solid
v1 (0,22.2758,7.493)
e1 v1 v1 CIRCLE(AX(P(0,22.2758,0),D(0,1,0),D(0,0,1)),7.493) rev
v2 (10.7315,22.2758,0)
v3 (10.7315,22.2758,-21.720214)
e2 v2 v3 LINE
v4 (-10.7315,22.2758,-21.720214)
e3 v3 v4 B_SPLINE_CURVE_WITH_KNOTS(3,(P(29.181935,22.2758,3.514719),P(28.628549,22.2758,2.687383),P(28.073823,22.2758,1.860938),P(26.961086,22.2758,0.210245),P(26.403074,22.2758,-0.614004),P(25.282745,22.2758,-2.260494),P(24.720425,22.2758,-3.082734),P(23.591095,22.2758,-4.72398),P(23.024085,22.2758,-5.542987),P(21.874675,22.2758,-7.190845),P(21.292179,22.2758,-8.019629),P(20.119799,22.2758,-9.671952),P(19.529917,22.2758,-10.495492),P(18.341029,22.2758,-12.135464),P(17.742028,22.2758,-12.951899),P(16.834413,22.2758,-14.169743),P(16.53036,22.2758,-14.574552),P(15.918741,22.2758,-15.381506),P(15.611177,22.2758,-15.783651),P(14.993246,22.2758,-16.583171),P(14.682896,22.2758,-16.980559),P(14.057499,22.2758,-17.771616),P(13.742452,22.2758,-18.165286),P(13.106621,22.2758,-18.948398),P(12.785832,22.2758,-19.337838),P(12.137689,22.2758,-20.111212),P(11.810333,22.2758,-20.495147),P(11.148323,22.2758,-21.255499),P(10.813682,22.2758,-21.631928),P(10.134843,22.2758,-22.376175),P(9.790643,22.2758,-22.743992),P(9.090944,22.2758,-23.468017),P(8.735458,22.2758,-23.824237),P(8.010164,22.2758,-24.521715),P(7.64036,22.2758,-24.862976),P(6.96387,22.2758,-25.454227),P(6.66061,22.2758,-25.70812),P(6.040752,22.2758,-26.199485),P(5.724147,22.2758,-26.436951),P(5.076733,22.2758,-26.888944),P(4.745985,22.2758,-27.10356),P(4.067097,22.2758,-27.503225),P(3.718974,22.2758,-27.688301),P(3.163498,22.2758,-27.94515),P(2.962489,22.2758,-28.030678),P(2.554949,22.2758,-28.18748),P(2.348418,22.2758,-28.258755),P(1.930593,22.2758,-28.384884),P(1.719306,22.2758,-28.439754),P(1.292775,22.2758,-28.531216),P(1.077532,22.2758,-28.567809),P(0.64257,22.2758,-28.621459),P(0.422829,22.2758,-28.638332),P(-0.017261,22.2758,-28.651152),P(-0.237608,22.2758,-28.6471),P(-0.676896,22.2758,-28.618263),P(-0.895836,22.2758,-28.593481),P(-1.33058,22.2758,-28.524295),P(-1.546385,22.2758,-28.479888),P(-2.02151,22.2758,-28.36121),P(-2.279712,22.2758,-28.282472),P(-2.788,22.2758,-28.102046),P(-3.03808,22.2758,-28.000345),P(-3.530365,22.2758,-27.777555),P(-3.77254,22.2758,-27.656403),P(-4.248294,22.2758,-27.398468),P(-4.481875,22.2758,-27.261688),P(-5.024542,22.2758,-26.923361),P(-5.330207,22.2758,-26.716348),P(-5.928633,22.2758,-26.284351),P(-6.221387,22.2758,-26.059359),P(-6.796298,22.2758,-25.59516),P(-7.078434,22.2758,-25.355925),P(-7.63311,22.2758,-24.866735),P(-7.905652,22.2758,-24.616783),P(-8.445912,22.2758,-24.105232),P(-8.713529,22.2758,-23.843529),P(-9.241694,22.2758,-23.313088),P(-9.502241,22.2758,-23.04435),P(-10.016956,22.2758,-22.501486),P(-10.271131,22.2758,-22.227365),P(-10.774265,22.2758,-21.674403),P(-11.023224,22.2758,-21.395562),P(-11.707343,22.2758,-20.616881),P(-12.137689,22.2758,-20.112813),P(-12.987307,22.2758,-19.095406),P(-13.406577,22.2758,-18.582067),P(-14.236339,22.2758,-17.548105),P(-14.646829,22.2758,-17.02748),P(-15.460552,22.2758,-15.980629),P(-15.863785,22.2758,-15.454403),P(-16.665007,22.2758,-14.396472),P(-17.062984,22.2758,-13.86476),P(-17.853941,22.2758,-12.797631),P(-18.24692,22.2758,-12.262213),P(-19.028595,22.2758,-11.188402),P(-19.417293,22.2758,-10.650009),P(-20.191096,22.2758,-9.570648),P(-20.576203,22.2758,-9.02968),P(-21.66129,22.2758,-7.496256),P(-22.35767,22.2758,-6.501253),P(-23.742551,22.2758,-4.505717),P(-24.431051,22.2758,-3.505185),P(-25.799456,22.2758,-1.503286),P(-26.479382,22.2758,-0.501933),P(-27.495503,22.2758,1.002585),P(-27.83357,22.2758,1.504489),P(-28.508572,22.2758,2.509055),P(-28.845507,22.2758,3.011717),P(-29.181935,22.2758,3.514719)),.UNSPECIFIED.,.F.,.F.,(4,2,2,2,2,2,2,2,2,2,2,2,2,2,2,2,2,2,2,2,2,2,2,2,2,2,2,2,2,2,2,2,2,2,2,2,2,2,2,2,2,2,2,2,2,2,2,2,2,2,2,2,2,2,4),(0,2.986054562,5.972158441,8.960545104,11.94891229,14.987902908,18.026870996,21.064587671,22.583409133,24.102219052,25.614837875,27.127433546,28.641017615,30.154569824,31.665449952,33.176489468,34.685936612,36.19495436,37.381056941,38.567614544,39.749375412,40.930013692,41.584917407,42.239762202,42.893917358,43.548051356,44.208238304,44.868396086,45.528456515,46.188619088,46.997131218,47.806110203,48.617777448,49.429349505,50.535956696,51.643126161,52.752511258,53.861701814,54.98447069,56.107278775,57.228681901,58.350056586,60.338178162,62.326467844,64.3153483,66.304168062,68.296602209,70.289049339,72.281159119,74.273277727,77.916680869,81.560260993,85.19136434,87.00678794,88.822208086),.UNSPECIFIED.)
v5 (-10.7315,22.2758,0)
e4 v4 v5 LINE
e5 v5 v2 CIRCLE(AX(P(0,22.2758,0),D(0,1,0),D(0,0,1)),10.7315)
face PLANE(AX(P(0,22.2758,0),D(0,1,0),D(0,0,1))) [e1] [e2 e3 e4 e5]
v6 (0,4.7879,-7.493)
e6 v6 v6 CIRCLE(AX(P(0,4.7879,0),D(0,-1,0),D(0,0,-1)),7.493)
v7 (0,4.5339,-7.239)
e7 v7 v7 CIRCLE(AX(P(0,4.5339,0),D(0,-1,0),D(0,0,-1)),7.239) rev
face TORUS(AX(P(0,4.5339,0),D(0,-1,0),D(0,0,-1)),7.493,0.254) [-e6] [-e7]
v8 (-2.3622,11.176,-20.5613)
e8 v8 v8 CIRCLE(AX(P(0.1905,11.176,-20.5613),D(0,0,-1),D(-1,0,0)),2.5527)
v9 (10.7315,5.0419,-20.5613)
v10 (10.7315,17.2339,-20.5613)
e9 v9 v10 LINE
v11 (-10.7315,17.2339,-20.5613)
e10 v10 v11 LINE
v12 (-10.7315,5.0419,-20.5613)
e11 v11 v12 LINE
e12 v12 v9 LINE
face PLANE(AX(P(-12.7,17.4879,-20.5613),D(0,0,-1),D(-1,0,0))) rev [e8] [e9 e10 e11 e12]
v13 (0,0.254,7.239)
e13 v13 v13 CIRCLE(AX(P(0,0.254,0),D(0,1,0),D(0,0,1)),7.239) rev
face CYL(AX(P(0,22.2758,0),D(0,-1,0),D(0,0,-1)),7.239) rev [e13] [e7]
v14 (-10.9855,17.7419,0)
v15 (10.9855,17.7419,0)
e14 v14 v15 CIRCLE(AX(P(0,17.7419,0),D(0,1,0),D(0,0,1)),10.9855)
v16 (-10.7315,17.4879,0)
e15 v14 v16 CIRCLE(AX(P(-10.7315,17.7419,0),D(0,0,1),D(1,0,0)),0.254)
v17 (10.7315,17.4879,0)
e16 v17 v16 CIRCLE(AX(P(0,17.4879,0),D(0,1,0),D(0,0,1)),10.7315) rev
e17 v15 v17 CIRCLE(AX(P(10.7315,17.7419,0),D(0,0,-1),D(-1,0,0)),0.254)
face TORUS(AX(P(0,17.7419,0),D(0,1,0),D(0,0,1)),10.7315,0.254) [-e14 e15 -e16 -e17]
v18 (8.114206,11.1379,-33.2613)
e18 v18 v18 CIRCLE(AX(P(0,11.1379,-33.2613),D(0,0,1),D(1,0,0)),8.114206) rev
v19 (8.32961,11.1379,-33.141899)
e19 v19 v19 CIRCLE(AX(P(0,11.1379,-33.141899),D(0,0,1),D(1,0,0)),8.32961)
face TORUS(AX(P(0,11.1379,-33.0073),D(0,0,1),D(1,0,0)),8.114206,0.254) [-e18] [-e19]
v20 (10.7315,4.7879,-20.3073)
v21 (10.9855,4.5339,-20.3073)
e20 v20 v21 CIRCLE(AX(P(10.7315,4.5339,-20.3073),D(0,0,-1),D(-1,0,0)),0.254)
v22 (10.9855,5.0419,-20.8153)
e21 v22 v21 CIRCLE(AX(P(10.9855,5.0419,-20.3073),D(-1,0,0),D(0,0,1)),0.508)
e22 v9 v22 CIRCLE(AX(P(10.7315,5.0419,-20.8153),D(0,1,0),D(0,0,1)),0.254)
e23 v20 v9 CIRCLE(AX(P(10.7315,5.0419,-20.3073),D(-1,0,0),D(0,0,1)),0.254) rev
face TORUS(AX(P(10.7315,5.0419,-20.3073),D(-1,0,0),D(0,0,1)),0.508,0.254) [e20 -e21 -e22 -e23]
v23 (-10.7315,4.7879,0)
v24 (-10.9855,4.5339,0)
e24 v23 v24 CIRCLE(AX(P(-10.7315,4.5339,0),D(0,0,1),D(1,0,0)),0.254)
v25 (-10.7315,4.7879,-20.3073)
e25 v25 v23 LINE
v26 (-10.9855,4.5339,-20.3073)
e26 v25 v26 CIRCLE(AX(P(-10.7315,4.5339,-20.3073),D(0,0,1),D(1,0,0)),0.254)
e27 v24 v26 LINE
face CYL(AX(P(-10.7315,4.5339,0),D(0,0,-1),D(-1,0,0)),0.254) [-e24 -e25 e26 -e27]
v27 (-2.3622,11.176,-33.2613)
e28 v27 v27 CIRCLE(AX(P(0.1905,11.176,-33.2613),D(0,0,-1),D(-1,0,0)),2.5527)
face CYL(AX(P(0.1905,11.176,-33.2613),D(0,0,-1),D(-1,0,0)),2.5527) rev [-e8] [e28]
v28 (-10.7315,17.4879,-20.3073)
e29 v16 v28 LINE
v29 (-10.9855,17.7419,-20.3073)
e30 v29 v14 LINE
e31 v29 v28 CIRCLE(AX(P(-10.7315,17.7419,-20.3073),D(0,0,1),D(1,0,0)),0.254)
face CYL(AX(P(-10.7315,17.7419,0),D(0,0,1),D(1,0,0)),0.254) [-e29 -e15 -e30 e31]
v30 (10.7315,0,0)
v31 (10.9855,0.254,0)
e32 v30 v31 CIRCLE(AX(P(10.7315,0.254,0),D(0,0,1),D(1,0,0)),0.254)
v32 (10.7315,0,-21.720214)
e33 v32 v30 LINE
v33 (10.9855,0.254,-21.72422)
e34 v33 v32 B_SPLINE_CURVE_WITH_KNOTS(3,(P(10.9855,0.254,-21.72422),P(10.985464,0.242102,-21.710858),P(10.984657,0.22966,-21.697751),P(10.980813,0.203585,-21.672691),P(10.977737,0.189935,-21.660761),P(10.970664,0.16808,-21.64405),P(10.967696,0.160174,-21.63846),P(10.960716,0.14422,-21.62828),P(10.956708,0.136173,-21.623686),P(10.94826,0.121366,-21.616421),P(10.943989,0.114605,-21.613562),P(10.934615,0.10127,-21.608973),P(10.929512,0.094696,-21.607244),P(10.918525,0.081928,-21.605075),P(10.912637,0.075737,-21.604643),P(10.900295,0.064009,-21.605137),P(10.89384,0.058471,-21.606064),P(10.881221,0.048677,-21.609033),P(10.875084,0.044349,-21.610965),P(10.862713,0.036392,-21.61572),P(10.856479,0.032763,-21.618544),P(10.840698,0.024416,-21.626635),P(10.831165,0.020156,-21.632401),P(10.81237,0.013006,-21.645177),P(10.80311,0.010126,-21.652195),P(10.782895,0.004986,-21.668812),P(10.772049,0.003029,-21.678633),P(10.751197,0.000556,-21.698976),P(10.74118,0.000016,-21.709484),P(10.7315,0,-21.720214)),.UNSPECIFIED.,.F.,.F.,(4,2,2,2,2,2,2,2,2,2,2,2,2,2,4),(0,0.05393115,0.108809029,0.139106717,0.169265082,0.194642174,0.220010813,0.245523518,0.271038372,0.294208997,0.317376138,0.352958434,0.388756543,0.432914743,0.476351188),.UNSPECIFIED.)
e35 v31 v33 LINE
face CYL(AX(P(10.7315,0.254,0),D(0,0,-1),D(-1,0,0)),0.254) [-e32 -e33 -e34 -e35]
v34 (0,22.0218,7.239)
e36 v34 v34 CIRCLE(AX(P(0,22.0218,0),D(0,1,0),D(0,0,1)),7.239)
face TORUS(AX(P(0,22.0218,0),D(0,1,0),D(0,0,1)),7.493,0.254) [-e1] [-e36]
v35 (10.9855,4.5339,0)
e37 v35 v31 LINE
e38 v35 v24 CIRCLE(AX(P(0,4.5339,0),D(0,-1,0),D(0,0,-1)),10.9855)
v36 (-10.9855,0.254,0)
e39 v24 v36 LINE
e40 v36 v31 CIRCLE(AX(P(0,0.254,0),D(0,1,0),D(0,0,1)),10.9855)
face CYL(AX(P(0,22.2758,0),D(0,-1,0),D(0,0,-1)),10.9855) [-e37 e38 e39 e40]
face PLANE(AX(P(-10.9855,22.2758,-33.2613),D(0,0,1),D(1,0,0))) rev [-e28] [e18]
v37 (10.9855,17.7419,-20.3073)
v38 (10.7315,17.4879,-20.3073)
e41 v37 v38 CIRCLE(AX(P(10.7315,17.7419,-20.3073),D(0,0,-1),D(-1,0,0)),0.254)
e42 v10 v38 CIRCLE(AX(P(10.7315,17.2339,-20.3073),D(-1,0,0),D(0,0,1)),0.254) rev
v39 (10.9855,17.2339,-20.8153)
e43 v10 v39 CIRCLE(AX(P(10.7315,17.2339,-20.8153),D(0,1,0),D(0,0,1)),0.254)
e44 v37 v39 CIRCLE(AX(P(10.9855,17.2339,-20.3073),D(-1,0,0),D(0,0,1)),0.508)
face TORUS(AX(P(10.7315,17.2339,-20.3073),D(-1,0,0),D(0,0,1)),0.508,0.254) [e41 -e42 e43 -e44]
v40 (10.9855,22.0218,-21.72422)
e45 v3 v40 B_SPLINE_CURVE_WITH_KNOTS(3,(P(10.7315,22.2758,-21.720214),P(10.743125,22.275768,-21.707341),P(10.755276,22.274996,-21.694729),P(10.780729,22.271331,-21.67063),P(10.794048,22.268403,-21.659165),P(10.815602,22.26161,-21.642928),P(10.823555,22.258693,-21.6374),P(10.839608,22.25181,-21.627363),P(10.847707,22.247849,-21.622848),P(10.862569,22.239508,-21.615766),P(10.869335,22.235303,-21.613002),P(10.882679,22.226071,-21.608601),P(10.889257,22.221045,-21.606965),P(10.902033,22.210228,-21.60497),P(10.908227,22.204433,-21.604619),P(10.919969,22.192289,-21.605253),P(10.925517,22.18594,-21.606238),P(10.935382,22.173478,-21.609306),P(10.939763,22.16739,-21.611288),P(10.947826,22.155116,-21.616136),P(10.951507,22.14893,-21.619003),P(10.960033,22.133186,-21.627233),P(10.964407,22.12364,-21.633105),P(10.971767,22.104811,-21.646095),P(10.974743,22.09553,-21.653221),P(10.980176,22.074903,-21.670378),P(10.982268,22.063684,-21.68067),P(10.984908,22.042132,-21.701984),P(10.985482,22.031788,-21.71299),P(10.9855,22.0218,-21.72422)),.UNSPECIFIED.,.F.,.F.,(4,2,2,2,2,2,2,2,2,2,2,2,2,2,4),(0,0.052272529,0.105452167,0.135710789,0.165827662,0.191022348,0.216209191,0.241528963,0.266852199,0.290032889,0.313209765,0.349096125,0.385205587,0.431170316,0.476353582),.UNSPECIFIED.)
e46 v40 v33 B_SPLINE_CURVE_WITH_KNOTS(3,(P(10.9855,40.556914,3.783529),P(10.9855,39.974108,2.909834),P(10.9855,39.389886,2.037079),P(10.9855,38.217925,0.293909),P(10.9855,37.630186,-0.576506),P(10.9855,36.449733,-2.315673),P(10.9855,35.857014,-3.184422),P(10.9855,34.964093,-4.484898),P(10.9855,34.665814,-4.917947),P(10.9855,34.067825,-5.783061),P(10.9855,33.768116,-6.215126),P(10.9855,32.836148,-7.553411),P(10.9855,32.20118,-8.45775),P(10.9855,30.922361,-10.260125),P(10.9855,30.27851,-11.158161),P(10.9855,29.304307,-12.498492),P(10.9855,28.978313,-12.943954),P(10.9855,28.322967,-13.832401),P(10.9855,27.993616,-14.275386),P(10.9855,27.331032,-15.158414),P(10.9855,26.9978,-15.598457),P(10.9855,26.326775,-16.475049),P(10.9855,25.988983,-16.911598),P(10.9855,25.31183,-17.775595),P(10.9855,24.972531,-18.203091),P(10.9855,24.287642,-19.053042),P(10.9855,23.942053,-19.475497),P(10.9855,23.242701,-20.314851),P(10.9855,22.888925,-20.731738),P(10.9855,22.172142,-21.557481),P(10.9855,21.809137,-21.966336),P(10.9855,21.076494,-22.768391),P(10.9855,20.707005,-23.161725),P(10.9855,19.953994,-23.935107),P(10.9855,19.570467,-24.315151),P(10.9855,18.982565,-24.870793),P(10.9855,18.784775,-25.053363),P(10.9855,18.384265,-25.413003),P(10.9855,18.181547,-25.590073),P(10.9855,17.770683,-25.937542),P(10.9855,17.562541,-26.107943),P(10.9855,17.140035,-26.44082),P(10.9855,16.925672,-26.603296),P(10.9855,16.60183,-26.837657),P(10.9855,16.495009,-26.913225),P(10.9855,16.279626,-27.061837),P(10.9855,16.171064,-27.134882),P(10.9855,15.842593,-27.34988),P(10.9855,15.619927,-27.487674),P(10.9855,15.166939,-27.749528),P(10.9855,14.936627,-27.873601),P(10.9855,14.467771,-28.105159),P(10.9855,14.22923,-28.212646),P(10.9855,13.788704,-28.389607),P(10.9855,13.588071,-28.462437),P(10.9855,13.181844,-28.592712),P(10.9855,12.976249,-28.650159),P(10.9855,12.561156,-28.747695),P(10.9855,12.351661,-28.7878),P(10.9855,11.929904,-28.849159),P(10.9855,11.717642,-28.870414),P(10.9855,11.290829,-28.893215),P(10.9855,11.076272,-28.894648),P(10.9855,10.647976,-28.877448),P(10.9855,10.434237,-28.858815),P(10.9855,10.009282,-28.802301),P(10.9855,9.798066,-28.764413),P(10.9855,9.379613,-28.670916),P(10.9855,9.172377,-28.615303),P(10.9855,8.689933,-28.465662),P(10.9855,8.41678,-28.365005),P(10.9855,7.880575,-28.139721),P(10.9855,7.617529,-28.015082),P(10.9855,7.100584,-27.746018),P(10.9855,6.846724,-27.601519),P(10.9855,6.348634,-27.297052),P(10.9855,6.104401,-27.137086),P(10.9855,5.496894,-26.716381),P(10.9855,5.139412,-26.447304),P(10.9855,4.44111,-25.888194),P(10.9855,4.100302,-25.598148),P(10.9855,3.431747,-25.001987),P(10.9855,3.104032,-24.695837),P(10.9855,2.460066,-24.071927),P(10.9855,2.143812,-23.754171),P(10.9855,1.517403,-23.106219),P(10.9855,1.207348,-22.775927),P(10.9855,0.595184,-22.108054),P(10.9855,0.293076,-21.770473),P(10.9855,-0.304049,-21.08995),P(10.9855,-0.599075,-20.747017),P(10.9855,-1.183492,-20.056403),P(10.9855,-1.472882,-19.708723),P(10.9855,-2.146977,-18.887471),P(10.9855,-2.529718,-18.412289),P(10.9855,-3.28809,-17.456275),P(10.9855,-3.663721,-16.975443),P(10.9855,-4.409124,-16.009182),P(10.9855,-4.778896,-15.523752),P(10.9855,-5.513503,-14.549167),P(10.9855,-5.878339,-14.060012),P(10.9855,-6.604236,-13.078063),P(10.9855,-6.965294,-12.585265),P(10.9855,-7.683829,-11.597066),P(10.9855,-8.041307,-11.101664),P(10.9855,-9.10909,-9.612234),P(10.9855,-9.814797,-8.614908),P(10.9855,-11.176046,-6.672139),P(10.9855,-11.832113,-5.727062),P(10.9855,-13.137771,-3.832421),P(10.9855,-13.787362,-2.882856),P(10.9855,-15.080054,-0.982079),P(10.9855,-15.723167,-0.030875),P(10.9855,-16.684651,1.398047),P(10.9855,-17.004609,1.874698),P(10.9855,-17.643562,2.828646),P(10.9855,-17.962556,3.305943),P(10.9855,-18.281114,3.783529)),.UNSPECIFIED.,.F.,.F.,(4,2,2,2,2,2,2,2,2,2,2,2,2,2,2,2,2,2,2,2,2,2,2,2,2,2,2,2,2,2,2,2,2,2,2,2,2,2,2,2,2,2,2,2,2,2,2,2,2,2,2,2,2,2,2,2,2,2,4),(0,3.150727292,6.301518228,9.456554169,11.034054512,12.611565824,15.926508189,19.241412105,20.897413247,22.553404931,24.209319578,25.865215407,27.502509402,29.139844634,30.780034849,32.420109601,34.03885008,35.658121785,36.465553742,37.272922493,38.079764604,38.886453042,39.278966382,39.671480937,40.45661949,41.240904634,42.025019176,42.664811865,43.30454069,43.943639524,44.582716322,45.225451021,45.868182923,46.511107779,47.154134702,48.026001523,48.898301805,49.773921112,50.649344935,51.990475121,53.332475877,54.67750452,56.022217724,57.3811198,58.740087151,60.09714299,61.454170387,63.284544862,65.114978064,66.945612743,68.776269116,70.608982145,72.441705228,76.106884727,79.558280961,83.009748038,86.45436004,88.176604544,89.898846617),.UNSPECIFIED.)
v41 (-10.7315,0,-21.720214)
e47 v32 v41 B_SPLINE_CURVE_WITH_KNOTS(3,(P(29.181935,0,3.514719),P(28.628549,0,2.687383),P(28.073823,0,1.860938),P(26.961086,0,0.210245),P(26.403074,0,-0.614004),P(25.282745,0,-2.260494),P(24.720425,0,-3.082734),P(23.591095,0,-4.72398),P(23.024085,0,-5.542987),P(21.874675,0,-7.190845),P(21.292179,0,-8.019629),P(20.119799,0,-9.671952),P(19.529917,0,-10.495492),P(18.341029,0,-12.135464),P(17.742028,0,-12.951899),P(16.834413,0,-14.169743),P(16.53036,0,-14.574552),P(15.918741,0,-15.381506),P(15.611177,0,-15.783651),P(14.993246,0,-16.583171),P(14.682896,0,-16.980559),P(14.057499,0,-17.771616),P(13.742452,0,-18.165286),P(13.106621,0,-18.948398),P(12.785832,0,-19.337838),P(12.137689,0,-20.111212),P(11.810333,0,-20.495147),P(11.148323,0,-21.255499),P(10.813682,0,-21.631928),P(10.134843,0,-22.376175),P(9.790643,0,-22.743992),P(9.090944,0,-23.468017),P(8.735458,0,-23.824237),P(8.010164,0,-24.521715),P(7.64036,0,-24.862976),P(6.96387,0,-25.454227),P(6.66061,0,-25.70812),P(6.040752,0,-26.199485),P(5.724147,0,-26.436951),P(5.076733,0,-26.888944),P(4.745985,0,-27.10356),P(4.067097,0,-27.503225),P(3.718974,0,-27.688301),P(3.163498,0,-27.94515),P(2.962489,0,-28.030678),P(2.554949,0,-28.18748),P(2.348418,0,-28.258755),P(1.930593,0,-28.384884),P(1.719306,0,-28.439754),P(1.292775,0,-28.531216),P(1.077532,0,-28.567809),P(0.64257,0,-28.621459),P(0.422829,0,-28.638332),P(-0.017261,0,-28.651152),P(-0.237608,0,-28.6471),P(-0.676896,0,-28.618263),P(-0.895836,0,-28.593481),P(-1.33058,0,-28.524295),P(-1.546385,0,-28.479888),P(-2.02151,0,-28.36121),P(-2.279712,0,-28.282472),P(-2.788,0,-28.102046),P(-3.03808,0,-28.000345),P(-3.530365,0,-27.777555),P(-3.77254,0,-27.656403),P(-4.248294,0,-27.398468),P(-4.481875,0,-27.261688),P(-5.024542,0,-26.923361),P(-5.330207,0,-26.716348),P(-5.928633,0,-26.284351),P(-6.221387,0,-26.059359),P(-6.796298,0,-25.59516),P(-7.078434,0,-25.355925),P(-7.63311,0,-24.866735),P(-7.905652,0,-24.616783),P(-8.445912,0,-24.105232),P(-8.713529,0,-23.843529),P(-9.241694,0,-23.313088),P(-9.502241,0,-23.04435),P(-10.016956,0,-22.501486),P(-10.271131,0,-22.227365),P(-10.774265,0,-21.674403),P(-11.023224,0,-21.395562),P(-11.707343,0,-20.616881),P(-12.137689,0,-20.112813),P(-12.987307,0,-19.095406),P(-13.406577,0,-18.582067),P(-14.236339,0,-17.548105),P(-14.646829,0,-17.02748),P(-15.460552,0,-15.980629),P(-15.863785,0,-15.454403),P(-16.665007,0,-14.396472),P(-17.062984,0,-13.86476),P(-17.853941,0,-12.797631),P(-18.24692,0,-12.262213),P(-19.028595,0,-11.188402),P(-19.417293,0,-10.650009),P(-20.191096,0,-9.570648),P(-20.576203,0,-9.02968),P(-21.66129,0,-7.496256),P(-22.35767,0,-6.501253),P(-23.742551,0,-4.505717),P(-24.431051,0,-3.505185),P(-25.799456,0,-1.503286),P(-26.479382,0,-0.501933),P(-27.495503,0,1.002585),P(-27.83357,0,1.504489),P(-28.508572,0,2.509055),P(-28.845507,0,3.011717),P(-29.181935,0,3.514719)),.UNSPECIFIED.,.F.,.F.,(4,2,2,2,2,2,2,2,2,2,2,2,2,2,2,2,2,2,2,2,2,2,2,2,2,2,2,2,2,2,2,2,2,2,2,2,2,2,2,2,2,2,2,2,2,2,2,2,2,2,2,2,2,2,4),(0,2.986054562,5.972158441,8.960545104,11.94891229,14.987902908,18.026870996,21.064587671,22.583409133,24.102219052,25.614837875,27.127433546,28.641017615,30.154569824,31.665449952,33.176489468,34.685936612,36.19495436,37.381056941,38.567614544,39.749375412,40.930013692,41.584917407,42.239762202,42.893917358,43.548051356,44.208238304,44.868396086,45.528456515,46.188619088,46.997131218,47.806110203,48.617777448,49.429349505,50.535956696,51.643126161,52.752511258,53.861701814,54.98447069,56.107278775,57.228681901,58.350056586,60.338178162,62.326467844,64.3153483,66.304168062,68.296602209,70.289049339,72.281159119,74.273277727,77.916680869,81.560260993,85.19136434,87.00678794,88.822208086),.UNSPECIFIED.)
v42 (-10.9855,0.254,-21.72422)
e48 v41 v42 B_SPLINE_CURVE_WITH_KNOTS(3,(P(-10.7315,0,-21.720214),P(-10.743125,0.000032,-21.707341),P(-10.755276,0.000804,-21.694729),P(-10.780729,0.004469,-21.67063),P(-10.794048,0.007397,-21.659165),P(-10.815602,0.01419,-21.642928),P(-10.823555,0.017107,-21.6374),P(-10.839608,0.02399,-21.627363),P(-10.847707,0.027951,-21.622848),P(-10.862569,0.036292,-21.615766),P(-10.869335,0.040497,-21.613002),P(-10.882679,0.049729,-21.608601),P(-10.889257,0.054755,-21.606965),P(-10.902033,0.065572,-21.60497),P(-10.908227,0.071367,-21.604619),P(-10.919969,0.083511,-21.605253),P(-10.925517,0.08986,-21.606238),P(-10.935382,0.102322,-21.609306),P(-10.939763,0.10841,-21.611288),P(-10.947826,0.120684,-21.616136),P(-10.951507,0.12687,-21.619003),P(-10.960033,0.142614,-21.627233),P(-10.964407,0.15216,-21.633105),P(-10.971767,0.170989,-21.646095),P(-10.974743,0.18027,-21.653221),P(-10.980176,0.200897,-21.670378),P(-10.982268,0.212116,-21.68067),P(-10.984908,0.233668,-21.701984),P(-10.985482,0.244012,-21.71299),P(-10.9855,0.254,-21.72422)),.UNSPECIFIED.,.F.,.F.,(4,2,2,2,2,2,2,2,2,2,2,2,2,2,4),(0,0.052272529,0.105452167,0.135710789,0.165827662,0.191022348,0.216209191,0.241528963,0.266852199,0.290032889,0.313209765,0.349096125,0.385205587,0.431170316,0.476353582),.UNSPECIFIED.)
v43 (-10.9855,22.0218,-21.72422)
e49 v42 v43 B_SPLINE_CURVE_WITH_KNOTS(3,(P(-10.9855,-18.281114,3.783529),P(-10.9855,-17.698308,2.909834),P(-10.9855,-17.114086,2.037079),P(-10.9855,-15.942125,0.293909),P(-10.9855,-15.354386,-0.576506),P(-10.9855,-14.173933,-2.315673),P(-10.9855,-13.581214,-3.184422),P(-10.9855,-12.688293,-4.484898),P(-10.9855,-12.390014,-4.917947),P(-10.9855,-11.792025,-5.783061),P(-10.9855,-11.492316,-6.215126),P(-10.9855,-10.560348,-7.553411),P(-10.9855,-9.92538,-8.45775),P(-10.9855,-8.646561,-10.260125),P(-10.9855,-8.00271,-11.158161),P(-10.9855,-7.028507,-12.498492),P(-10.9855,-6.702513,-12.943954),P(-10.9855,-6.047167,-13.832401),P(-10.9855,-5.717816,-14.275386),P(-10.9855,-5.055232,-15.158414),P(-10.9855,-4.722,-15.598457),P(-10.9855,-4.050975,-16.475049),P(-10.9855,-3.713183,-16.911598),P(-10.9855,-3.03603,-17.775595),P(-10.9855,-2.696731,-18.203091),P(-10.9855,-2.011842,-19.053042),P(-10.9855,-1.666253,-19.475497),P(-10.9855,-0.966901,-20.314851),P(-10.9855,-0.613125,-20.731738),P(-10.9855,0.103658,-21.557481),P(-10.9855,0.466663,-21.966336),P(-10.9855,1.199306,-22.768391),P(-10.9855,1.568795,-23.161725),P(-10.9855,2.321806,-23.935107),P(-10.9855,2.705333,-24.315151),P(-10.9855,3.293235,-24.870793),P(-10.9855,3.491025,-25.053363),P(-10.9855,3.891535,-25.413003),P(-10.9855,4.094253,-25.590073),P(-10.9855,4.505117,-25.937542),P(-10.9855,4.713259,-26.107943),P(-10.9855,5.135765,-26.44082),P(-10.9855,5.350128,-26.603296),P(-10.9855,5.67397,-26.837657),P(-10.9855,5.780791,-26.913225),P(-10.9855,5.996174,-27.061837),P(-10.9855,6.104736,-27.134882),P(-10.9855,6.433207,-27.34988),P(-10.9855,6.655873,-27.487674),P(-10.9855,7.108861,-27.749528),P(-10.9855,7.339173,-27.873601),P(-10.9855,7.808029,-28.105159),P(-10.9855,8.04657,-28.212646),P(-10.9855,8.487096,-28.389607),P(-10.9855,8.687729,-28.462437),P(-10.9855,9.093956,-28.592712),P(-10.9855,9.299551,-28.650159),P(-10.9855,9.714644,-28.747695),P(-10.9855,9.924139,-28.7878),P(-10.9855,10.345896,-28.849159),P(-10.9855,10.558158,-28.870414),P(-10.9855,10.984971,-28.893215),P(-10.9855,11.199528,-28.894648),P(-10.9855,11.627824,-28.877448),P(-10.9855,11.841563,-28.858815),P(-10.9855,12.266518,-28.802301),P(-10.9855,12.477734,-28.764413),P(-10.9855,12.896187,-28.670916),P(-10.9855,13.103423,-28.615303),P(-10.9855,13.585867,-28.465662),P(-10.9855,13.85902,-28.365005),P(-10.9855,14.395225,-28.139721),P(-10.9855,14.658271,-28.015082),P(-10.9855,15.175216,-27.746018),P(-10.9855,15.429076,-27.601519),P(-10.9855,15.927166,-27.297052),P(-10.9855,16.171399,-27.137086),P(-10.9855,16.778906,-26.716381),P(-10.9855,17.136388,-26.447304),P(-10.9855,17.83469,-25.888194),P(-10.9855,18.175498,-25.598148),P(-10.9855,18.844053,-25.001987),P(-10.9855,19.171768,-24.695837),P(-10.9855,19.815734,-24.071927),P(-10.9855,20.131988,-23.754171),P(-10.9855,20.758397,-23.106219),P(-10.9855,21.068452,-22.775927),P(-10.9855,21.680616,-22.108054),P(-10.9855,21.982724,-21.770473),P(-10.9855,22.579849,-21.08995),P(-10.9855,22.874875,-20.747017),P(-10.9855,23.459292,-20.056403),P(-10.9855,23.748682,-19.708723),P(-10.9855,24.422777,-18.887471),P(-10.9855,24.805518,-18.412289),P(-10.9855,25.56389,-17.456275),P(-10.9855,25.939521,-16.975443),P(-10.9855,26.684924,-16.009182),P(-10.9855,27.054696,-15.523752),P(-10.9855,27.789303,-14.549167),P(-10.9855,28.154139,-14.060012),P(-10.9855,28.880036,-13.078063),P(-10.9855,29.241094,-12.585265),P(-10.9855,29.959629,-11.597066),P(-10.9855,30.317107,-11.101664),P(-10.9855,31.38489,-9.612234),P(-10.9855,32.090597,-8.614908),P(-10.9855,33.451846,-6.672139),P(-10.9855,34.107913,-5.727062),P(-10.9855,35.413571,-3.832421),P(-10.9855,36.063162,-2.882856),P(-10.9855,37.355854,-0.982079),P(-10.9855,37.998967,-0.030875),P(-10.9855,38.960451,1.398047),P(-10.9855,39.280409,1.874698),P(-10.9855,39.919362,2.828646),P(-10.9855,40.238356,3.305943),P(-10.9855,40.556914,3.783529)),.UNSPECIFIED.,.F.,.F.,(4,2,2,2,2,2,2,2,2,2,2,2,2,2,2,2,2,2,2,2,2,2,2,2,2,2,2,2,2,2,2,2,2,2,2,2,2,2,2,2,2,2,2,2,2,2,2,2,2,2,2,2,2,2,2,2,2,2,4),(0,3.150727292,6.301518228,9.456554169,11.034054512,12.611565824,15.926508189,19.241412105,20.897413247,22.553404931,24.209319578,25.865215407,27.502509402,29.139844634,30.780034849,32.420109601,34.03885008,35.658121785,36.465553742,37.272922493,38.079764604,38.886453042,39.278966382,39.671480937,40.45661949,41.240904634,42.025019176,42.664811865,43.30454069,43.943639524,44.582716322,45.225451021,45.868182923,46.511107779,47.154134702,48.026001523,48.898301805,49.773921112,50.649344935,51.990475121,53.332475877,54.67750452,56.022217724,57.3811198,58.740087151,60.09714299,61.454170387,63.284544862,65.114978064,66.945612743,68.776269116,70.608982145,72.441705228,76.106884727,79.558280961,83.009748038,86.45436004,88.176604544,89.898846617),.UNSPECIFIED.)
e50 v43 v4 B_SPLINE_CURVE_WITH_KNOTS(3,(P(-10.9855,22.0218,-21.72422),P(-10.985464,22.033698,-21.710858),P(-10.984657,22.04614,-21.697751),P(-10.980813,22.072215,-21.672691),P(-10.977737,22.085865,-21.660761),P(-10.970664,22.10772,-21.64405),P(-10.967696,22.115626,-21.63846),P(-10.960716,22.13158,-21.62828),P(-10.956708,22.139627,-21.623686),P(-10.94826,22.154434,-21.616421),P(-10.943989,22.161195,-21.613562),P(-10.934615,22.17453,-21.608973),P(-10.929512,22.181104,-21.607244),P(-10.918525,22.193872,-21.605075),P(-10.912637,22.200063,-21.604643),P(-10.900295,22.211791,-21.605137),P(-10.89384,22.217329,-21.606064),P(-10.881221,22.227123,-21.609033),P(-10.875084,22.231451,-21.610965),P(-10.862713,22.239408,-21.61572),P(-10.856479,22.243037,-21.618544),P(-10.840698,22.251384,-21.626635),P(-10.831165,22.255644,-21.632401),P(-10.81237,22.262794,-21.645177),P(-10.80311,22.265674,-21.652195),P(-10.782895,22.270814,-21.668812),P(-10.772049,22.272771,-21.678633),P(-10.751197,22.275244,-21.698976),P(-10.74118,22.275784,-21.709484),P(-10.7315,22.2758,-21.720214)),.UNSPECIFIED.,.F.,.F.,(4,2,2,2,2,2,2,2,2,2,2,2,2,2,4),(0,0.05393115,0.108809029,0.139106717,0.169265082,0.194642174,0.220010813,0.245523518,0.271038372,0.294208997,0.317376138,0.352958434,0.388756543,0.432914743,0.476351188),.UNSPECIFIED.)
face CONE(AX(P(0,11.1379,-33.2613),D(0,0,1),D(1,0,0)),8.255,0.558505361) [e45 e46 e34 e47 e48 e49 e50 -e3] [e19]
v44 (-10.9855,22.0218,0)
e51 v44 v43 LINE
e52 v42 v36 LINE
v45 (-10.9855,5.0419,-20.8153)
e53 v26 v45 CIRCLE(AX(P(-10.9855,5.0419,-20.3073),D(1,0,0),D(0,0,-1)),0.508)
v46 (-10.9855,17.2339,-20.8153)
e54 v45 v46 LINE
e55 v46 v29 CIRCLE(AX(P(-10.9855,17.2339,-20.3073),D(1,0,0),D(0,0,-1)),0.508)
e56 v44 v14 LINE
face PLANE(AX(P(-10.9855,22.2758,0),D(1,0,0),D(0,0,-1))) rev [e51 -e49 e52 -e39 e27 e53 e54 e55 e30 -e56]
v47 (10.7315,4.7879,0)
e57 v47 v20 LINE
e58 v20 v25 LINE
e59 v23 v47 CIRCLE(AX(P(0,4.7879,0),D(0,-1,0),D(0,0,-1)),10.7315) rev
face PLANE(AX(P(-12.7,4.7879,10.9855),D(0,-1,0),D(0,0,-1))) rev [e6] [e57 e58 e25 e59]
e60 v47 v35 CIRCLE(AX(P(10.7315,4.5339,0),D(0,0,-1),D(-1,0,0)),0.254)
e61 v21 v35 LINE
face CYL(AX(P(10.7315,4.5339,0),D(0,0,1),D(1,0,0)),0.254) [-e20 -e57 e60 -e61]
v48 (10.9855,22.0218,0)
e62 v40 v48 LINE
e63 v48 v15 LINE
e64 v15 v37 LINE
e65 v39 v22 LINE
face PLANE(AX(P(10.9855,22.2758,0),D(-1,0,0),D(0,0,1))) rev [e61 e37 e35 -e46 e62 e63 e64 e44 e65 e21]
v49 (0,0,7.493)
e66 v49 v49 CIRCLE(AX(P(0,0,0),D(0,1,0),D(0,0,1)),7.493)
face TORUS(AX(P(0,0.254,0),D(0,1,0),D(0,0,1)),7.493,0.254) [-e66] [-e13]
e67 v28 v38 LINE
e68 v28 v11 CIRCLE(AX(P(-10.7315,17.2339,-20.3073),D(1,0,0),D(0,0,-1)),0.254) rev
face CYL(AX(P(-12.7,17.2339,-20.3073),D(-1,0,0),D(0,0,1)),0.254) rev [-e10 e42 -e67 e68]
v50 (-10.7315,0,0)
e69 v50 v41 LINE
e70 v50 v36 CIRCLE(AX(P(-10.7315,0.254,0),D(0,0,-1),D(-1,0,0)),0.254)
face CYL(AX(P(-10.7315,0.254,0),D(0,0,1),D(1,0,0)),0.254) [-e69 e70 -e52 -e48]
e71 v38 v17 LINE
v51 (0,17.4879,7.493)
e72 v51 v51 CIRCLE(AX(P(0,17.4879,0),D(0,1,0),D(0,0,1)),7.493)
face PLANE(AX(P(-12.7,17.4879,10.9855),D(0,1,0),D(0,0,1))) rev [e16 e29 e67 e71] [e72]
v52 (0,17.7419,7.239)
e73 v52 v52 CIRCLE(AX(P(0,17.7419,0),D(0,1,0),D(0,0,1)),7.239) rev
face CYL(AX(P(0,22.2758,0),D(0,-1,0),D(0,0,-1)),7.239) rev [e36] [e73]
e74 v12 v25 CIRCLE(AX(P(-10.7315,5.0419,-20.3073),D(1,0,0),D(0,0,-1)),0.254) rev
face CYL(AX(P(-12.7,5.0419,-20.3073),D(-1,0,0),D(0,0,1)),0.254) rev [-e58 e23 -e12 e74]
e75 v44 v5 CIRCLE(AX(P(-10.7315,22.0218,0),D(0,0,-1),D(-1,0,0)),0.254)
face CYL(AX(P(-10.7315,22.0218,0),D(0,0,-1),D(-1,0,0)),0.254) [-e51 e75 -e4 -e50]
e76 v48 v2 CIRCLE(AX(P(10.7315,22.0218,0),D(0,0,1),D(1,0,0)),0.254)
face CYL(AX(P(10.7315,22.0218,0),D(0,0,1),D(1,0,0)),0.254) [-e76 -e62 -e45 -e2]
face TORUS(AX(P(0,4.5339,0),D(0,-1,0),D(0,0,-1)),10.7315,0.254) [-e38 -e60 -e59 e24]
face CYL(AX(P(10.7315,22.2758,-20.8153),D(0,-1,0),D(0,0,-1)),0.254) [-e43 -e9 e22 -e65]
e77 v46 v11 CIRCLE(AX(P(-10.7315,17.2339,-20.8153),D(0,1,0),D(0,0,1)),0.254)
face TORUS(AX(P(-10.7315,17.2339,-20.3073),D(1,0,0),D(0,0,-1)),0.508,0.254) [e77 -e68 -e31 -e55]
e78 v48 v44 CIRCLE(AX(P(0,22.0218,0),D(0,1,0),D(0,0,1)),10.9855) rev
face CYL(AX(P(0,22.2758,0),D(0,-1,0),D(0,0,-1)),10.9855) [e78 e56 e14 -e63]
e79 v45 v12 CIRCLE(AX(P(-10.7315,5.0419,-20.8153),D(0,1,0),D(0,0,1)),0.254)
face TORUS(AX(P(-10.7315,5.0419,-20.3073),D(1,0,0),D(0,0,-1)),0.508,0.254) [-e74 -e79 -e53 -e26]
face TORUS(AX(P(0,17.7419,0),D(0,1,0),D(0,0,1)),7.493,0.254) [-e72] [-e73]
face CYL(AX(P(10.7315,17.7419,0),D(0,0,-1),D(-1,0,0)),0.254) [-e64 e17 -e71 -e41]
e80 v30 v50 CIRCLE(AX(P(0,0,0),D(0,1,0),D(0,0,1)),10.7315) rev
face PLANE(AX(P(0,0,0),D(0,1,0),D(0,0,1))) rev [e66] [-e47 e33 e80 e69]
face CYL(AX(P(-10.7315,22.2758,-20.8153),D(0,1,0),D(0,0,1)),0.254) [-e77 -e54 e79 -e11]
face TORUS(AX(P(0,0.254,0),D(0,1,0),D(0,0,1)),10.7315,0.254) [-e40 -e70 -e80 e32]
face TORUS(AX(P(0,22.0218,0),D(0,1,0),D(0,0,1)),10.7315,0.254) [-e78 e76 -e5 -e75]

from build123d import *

# Parameters (mm, degrees)
SKETCH1_R                   = 7.239
BOSS_EXTRUDE1_DEPTH         = 22.2758
SKETCH2_W                   = 31.5468
SKETCH2_H                   = 12.7
CUT_EXTRUDE1_DEPTH          = 12.7
FILLET1_R                   = 0.254
FILLET2_R                   = 0.254
FILLET3_R                   = 0.254
FILLET4_R                   = 0.254
FILLET5_R                   = 0.254
F_1_4_20_TAPPED_HOLE1_D     = 5.1054
F_1_4_20_TAPPED_HOLE1_DEPTH = 16.51
F_1_4_20_TAPPED_HOLE1_TIP   = 1.533816902


with BuildPart() as part:
    # Sketch1 → Boss-Extrude1 (new body)
    with BuildSketch(Plane(origin=(0, 0, 0), x_dir=(1, 0, 0), z_dir=(0, 1, 0))):
        with BuildLine():
            Line((-10.9855, 0), (-10.9855, 33.2613))
            Line((-10.9855, 33.2613), (10.9855, 33.2613))
            Line((10.9855, 33.2613), (10.9855, 0))
            ThreePointArc((10.9855, 0), (0, -10.9855), (-10.9855, 0))
        make_face()
        with Locations(Location((0, 0, 0), (0, 0, 270))):
            Circle(SKETCH1_R, mode=Mode.SUBTRACT)
    extrude(amount=BOSS_EXTRUDE1_DEPTH)

    # Sketch2 → Cut-Extrude1 (cut, symmetric)
    with BuildSketch(Plane(origin=(0, 0, 0), x_dir=(0, 0, -1), z_dir=(1, 0, 0))):
        with Locations((4.7879, 11.1379)):
            Rectangle(SKETCH2_W, SKETCH2_H)
    extrude(amount=CUT_EXTRUDE1_DEPTH, both=True, mode=Mode.SUBTRACT)

    # Sketch5 → Cut-Revolve1 (revolve, cut)
    with BuildSketch(Plane(origin=(5.568421495, 5.492228727, 0), x_dir=(0, 0, 1), z_dir=(-0.7119608885898049, -0.7022191204449046, 0)), mode=Mode.PRIVATE) as cut_revolve1_sk:
        Polygon((-21.436464447, 23.57372651), (-33.2613, 16.184749181), (-33.2613, 23.57372651), align=None)
    revolve(cut_revolve1_sk.sketch.rotate(Axis((0, 11.1379, -33.2613), (0, 0, 1)), 270.789356568), axis=Axis((0, 11.1379, -33.2613), (0, 0, 1)), mode=Mode.SUBTRACT)

    # Fillet1
    fillet1_edges = [part.edges().sort_by_distance(p)[0] for p in [
        (0, 17.4879, -20.5613),
        (0, 4.7879, -20.5613),
    ]]
    fillet(fillet1_edges, radius=FILLET1_R)

    # Fillet2
    fillet2_edges = [part.edges().sort_by_distance(p)[0] for p in [
        (0, 17.4879, 10.9855),
        (10.9855, 17.4879, -10.15365),
        (0, 4.7879, 10.9855),
        (-10.9855, 4.7879, -10.15365),
        (-10.9855, 11.1379, -20.5613),
        (10.9855, 11.1379, -20.5613),
        (10.9855, 4.7879, -10.15365),
        (-10.9855, 17.4879, -10.15365),
        (10.9855, 4.862294878, -20.486905122),
        (-10.9855, 4.862294878, -20.486905122),
        (10.9855, 17.413505122, -20.486905122),
        (-10.9855, 17.413505122, -20.486905122),
    ]]
    fillet(fillet2_edges, radius=FILLET2_R)

    # Fillet3
    # the kernel refuses this fillet: 0.254 mm, written as the material it takes off along each edge
    with BuildSketch(Plane(origin=(-10.9855, 22.2758, 0), x_dir=(0, -1, 0), z_dir=(0, 0, -1)), Plane(origin=(10.9855, 0, -22.071464447), x_dir=(-1, 0, 0), z_dir=(0, 0, 1))) as fillet3_piece_1:
        with BuildLine():
            CenterArc((FILLET3_R, -FILLET3_R), FILLET3_R, 90, 90)
            Line((0, -FILLET3_R), (0, 0))
            Line((0, 0), (FILLET3_R, 0))
        make_face()
    extrude(amount=22.071464447, mode=Mode.SUBTRACT)
    with BuildSketch(Plane(origin=(0, 22.2758, 0), x_dir=(1, 0, 0), z_dir=(0, 0, -1))) as fillet3_piece_2:
        with BuildLine():
            CenterArc((10.9855 - FILLET3_R, FILLET3_R), FILLET3_R, 270, 90)
            Line((10.9855 - FILLET3_R, 0), (10.9855, 0))
            Line((10.9855, 0), (10.9855, FILLET3_R))
        make_face()
    revolve(axis=Axis((0, 22.2758, 0), (0, -1, 0)), revolution_arc=180, mode=Mode.SUBTRACT)
    with BuildSketch(Plane(origin=(10.9855, 22.2758, -22.071464447), x_dir=(-1, 0, 0), z_dir=(0, 0, 1)), Plane(origin=(-10.9855, 0, 0), x_dir=(0, 1, 0), z_dir=(0, 0, -1))) as fillet3_piece_3:
        with BuildLine():
            CenterArc((FILLET3_R, FILLET3_R), FILLET3_R, 180, 90)
            Line((0, FILLET3_R), (0, 0))
            Line((0, 0), (FILLET3_R, 0))
        make_face()
    extrude(amount=22.071464447, mode=Mode.SUBTRACT)
    with BuildSketch(Plane(origin=(0, 0, 0), x_dir=(1, 0, 0), z_dir=(0, 0, -1))) as fillet3_piece_4:
        with BuildLine():
            CenterArc((10.9855 - FILLET3_R, -FILLET3_R), FILLET3_R, 0, 90)
            Line((10.9855, -FILLET3_R), (10.9855, 0))
            Line((10.9855, 0), (10.9855 - FILLET3_R, 0))
        make_face()
    revolve(axis=Axis((0, 0, 0), (0, -1, 0)), revolution_arc=180, mode=Mode.SUBTRACT)

    # Fillet4
    fillet4_edges = [part.edges().sort_by_distance(p)[0] for p in [
        (0, 0, -7.239),
        (0, 22.2758, -7.239),
        (0, 17.4879, -7.239),
        (0, 4.7879, -7.239),
    ]]
    fillet(fillet4_edges, radius=FILLET4_R)

    # Fillet5
    fillet5_edges = [part.edges().sort_by_distance(p)[0] for p in [
        (-5.796819888, 5.260663899, -33.2613),
    ]]
    fillet(fillet5_edges, radius=FILLET5_R)

    # 1/4-20 Tapped Hole1
    with Locations(Plane(origin=(0, 0, -33.2613), x_dir=(-1, 0, 0), z_dir=(0, 0, -1))):
        with Locations((-0.1905, 11.176)):
            Hole(F_1_4_20_TAPPED_HOLE1_D / 2, depth=F_1_4_20_TAPPED_HOLE1_DEPTH)
            with Locations((0, 0, -(F_1_4_20_TAPPED_HOLE1_DEPTH + F_1_4_20_TAPPED_HOLE1_TIP / 2))):  # 118° drill point
                Cone(0, F_1_4_20_TAPPED_HOLE1_D / 2, F_1_4_20_TAPPED_HOLE1_TIP, mode=Mode.SUBTRACT)


solid = part.part
